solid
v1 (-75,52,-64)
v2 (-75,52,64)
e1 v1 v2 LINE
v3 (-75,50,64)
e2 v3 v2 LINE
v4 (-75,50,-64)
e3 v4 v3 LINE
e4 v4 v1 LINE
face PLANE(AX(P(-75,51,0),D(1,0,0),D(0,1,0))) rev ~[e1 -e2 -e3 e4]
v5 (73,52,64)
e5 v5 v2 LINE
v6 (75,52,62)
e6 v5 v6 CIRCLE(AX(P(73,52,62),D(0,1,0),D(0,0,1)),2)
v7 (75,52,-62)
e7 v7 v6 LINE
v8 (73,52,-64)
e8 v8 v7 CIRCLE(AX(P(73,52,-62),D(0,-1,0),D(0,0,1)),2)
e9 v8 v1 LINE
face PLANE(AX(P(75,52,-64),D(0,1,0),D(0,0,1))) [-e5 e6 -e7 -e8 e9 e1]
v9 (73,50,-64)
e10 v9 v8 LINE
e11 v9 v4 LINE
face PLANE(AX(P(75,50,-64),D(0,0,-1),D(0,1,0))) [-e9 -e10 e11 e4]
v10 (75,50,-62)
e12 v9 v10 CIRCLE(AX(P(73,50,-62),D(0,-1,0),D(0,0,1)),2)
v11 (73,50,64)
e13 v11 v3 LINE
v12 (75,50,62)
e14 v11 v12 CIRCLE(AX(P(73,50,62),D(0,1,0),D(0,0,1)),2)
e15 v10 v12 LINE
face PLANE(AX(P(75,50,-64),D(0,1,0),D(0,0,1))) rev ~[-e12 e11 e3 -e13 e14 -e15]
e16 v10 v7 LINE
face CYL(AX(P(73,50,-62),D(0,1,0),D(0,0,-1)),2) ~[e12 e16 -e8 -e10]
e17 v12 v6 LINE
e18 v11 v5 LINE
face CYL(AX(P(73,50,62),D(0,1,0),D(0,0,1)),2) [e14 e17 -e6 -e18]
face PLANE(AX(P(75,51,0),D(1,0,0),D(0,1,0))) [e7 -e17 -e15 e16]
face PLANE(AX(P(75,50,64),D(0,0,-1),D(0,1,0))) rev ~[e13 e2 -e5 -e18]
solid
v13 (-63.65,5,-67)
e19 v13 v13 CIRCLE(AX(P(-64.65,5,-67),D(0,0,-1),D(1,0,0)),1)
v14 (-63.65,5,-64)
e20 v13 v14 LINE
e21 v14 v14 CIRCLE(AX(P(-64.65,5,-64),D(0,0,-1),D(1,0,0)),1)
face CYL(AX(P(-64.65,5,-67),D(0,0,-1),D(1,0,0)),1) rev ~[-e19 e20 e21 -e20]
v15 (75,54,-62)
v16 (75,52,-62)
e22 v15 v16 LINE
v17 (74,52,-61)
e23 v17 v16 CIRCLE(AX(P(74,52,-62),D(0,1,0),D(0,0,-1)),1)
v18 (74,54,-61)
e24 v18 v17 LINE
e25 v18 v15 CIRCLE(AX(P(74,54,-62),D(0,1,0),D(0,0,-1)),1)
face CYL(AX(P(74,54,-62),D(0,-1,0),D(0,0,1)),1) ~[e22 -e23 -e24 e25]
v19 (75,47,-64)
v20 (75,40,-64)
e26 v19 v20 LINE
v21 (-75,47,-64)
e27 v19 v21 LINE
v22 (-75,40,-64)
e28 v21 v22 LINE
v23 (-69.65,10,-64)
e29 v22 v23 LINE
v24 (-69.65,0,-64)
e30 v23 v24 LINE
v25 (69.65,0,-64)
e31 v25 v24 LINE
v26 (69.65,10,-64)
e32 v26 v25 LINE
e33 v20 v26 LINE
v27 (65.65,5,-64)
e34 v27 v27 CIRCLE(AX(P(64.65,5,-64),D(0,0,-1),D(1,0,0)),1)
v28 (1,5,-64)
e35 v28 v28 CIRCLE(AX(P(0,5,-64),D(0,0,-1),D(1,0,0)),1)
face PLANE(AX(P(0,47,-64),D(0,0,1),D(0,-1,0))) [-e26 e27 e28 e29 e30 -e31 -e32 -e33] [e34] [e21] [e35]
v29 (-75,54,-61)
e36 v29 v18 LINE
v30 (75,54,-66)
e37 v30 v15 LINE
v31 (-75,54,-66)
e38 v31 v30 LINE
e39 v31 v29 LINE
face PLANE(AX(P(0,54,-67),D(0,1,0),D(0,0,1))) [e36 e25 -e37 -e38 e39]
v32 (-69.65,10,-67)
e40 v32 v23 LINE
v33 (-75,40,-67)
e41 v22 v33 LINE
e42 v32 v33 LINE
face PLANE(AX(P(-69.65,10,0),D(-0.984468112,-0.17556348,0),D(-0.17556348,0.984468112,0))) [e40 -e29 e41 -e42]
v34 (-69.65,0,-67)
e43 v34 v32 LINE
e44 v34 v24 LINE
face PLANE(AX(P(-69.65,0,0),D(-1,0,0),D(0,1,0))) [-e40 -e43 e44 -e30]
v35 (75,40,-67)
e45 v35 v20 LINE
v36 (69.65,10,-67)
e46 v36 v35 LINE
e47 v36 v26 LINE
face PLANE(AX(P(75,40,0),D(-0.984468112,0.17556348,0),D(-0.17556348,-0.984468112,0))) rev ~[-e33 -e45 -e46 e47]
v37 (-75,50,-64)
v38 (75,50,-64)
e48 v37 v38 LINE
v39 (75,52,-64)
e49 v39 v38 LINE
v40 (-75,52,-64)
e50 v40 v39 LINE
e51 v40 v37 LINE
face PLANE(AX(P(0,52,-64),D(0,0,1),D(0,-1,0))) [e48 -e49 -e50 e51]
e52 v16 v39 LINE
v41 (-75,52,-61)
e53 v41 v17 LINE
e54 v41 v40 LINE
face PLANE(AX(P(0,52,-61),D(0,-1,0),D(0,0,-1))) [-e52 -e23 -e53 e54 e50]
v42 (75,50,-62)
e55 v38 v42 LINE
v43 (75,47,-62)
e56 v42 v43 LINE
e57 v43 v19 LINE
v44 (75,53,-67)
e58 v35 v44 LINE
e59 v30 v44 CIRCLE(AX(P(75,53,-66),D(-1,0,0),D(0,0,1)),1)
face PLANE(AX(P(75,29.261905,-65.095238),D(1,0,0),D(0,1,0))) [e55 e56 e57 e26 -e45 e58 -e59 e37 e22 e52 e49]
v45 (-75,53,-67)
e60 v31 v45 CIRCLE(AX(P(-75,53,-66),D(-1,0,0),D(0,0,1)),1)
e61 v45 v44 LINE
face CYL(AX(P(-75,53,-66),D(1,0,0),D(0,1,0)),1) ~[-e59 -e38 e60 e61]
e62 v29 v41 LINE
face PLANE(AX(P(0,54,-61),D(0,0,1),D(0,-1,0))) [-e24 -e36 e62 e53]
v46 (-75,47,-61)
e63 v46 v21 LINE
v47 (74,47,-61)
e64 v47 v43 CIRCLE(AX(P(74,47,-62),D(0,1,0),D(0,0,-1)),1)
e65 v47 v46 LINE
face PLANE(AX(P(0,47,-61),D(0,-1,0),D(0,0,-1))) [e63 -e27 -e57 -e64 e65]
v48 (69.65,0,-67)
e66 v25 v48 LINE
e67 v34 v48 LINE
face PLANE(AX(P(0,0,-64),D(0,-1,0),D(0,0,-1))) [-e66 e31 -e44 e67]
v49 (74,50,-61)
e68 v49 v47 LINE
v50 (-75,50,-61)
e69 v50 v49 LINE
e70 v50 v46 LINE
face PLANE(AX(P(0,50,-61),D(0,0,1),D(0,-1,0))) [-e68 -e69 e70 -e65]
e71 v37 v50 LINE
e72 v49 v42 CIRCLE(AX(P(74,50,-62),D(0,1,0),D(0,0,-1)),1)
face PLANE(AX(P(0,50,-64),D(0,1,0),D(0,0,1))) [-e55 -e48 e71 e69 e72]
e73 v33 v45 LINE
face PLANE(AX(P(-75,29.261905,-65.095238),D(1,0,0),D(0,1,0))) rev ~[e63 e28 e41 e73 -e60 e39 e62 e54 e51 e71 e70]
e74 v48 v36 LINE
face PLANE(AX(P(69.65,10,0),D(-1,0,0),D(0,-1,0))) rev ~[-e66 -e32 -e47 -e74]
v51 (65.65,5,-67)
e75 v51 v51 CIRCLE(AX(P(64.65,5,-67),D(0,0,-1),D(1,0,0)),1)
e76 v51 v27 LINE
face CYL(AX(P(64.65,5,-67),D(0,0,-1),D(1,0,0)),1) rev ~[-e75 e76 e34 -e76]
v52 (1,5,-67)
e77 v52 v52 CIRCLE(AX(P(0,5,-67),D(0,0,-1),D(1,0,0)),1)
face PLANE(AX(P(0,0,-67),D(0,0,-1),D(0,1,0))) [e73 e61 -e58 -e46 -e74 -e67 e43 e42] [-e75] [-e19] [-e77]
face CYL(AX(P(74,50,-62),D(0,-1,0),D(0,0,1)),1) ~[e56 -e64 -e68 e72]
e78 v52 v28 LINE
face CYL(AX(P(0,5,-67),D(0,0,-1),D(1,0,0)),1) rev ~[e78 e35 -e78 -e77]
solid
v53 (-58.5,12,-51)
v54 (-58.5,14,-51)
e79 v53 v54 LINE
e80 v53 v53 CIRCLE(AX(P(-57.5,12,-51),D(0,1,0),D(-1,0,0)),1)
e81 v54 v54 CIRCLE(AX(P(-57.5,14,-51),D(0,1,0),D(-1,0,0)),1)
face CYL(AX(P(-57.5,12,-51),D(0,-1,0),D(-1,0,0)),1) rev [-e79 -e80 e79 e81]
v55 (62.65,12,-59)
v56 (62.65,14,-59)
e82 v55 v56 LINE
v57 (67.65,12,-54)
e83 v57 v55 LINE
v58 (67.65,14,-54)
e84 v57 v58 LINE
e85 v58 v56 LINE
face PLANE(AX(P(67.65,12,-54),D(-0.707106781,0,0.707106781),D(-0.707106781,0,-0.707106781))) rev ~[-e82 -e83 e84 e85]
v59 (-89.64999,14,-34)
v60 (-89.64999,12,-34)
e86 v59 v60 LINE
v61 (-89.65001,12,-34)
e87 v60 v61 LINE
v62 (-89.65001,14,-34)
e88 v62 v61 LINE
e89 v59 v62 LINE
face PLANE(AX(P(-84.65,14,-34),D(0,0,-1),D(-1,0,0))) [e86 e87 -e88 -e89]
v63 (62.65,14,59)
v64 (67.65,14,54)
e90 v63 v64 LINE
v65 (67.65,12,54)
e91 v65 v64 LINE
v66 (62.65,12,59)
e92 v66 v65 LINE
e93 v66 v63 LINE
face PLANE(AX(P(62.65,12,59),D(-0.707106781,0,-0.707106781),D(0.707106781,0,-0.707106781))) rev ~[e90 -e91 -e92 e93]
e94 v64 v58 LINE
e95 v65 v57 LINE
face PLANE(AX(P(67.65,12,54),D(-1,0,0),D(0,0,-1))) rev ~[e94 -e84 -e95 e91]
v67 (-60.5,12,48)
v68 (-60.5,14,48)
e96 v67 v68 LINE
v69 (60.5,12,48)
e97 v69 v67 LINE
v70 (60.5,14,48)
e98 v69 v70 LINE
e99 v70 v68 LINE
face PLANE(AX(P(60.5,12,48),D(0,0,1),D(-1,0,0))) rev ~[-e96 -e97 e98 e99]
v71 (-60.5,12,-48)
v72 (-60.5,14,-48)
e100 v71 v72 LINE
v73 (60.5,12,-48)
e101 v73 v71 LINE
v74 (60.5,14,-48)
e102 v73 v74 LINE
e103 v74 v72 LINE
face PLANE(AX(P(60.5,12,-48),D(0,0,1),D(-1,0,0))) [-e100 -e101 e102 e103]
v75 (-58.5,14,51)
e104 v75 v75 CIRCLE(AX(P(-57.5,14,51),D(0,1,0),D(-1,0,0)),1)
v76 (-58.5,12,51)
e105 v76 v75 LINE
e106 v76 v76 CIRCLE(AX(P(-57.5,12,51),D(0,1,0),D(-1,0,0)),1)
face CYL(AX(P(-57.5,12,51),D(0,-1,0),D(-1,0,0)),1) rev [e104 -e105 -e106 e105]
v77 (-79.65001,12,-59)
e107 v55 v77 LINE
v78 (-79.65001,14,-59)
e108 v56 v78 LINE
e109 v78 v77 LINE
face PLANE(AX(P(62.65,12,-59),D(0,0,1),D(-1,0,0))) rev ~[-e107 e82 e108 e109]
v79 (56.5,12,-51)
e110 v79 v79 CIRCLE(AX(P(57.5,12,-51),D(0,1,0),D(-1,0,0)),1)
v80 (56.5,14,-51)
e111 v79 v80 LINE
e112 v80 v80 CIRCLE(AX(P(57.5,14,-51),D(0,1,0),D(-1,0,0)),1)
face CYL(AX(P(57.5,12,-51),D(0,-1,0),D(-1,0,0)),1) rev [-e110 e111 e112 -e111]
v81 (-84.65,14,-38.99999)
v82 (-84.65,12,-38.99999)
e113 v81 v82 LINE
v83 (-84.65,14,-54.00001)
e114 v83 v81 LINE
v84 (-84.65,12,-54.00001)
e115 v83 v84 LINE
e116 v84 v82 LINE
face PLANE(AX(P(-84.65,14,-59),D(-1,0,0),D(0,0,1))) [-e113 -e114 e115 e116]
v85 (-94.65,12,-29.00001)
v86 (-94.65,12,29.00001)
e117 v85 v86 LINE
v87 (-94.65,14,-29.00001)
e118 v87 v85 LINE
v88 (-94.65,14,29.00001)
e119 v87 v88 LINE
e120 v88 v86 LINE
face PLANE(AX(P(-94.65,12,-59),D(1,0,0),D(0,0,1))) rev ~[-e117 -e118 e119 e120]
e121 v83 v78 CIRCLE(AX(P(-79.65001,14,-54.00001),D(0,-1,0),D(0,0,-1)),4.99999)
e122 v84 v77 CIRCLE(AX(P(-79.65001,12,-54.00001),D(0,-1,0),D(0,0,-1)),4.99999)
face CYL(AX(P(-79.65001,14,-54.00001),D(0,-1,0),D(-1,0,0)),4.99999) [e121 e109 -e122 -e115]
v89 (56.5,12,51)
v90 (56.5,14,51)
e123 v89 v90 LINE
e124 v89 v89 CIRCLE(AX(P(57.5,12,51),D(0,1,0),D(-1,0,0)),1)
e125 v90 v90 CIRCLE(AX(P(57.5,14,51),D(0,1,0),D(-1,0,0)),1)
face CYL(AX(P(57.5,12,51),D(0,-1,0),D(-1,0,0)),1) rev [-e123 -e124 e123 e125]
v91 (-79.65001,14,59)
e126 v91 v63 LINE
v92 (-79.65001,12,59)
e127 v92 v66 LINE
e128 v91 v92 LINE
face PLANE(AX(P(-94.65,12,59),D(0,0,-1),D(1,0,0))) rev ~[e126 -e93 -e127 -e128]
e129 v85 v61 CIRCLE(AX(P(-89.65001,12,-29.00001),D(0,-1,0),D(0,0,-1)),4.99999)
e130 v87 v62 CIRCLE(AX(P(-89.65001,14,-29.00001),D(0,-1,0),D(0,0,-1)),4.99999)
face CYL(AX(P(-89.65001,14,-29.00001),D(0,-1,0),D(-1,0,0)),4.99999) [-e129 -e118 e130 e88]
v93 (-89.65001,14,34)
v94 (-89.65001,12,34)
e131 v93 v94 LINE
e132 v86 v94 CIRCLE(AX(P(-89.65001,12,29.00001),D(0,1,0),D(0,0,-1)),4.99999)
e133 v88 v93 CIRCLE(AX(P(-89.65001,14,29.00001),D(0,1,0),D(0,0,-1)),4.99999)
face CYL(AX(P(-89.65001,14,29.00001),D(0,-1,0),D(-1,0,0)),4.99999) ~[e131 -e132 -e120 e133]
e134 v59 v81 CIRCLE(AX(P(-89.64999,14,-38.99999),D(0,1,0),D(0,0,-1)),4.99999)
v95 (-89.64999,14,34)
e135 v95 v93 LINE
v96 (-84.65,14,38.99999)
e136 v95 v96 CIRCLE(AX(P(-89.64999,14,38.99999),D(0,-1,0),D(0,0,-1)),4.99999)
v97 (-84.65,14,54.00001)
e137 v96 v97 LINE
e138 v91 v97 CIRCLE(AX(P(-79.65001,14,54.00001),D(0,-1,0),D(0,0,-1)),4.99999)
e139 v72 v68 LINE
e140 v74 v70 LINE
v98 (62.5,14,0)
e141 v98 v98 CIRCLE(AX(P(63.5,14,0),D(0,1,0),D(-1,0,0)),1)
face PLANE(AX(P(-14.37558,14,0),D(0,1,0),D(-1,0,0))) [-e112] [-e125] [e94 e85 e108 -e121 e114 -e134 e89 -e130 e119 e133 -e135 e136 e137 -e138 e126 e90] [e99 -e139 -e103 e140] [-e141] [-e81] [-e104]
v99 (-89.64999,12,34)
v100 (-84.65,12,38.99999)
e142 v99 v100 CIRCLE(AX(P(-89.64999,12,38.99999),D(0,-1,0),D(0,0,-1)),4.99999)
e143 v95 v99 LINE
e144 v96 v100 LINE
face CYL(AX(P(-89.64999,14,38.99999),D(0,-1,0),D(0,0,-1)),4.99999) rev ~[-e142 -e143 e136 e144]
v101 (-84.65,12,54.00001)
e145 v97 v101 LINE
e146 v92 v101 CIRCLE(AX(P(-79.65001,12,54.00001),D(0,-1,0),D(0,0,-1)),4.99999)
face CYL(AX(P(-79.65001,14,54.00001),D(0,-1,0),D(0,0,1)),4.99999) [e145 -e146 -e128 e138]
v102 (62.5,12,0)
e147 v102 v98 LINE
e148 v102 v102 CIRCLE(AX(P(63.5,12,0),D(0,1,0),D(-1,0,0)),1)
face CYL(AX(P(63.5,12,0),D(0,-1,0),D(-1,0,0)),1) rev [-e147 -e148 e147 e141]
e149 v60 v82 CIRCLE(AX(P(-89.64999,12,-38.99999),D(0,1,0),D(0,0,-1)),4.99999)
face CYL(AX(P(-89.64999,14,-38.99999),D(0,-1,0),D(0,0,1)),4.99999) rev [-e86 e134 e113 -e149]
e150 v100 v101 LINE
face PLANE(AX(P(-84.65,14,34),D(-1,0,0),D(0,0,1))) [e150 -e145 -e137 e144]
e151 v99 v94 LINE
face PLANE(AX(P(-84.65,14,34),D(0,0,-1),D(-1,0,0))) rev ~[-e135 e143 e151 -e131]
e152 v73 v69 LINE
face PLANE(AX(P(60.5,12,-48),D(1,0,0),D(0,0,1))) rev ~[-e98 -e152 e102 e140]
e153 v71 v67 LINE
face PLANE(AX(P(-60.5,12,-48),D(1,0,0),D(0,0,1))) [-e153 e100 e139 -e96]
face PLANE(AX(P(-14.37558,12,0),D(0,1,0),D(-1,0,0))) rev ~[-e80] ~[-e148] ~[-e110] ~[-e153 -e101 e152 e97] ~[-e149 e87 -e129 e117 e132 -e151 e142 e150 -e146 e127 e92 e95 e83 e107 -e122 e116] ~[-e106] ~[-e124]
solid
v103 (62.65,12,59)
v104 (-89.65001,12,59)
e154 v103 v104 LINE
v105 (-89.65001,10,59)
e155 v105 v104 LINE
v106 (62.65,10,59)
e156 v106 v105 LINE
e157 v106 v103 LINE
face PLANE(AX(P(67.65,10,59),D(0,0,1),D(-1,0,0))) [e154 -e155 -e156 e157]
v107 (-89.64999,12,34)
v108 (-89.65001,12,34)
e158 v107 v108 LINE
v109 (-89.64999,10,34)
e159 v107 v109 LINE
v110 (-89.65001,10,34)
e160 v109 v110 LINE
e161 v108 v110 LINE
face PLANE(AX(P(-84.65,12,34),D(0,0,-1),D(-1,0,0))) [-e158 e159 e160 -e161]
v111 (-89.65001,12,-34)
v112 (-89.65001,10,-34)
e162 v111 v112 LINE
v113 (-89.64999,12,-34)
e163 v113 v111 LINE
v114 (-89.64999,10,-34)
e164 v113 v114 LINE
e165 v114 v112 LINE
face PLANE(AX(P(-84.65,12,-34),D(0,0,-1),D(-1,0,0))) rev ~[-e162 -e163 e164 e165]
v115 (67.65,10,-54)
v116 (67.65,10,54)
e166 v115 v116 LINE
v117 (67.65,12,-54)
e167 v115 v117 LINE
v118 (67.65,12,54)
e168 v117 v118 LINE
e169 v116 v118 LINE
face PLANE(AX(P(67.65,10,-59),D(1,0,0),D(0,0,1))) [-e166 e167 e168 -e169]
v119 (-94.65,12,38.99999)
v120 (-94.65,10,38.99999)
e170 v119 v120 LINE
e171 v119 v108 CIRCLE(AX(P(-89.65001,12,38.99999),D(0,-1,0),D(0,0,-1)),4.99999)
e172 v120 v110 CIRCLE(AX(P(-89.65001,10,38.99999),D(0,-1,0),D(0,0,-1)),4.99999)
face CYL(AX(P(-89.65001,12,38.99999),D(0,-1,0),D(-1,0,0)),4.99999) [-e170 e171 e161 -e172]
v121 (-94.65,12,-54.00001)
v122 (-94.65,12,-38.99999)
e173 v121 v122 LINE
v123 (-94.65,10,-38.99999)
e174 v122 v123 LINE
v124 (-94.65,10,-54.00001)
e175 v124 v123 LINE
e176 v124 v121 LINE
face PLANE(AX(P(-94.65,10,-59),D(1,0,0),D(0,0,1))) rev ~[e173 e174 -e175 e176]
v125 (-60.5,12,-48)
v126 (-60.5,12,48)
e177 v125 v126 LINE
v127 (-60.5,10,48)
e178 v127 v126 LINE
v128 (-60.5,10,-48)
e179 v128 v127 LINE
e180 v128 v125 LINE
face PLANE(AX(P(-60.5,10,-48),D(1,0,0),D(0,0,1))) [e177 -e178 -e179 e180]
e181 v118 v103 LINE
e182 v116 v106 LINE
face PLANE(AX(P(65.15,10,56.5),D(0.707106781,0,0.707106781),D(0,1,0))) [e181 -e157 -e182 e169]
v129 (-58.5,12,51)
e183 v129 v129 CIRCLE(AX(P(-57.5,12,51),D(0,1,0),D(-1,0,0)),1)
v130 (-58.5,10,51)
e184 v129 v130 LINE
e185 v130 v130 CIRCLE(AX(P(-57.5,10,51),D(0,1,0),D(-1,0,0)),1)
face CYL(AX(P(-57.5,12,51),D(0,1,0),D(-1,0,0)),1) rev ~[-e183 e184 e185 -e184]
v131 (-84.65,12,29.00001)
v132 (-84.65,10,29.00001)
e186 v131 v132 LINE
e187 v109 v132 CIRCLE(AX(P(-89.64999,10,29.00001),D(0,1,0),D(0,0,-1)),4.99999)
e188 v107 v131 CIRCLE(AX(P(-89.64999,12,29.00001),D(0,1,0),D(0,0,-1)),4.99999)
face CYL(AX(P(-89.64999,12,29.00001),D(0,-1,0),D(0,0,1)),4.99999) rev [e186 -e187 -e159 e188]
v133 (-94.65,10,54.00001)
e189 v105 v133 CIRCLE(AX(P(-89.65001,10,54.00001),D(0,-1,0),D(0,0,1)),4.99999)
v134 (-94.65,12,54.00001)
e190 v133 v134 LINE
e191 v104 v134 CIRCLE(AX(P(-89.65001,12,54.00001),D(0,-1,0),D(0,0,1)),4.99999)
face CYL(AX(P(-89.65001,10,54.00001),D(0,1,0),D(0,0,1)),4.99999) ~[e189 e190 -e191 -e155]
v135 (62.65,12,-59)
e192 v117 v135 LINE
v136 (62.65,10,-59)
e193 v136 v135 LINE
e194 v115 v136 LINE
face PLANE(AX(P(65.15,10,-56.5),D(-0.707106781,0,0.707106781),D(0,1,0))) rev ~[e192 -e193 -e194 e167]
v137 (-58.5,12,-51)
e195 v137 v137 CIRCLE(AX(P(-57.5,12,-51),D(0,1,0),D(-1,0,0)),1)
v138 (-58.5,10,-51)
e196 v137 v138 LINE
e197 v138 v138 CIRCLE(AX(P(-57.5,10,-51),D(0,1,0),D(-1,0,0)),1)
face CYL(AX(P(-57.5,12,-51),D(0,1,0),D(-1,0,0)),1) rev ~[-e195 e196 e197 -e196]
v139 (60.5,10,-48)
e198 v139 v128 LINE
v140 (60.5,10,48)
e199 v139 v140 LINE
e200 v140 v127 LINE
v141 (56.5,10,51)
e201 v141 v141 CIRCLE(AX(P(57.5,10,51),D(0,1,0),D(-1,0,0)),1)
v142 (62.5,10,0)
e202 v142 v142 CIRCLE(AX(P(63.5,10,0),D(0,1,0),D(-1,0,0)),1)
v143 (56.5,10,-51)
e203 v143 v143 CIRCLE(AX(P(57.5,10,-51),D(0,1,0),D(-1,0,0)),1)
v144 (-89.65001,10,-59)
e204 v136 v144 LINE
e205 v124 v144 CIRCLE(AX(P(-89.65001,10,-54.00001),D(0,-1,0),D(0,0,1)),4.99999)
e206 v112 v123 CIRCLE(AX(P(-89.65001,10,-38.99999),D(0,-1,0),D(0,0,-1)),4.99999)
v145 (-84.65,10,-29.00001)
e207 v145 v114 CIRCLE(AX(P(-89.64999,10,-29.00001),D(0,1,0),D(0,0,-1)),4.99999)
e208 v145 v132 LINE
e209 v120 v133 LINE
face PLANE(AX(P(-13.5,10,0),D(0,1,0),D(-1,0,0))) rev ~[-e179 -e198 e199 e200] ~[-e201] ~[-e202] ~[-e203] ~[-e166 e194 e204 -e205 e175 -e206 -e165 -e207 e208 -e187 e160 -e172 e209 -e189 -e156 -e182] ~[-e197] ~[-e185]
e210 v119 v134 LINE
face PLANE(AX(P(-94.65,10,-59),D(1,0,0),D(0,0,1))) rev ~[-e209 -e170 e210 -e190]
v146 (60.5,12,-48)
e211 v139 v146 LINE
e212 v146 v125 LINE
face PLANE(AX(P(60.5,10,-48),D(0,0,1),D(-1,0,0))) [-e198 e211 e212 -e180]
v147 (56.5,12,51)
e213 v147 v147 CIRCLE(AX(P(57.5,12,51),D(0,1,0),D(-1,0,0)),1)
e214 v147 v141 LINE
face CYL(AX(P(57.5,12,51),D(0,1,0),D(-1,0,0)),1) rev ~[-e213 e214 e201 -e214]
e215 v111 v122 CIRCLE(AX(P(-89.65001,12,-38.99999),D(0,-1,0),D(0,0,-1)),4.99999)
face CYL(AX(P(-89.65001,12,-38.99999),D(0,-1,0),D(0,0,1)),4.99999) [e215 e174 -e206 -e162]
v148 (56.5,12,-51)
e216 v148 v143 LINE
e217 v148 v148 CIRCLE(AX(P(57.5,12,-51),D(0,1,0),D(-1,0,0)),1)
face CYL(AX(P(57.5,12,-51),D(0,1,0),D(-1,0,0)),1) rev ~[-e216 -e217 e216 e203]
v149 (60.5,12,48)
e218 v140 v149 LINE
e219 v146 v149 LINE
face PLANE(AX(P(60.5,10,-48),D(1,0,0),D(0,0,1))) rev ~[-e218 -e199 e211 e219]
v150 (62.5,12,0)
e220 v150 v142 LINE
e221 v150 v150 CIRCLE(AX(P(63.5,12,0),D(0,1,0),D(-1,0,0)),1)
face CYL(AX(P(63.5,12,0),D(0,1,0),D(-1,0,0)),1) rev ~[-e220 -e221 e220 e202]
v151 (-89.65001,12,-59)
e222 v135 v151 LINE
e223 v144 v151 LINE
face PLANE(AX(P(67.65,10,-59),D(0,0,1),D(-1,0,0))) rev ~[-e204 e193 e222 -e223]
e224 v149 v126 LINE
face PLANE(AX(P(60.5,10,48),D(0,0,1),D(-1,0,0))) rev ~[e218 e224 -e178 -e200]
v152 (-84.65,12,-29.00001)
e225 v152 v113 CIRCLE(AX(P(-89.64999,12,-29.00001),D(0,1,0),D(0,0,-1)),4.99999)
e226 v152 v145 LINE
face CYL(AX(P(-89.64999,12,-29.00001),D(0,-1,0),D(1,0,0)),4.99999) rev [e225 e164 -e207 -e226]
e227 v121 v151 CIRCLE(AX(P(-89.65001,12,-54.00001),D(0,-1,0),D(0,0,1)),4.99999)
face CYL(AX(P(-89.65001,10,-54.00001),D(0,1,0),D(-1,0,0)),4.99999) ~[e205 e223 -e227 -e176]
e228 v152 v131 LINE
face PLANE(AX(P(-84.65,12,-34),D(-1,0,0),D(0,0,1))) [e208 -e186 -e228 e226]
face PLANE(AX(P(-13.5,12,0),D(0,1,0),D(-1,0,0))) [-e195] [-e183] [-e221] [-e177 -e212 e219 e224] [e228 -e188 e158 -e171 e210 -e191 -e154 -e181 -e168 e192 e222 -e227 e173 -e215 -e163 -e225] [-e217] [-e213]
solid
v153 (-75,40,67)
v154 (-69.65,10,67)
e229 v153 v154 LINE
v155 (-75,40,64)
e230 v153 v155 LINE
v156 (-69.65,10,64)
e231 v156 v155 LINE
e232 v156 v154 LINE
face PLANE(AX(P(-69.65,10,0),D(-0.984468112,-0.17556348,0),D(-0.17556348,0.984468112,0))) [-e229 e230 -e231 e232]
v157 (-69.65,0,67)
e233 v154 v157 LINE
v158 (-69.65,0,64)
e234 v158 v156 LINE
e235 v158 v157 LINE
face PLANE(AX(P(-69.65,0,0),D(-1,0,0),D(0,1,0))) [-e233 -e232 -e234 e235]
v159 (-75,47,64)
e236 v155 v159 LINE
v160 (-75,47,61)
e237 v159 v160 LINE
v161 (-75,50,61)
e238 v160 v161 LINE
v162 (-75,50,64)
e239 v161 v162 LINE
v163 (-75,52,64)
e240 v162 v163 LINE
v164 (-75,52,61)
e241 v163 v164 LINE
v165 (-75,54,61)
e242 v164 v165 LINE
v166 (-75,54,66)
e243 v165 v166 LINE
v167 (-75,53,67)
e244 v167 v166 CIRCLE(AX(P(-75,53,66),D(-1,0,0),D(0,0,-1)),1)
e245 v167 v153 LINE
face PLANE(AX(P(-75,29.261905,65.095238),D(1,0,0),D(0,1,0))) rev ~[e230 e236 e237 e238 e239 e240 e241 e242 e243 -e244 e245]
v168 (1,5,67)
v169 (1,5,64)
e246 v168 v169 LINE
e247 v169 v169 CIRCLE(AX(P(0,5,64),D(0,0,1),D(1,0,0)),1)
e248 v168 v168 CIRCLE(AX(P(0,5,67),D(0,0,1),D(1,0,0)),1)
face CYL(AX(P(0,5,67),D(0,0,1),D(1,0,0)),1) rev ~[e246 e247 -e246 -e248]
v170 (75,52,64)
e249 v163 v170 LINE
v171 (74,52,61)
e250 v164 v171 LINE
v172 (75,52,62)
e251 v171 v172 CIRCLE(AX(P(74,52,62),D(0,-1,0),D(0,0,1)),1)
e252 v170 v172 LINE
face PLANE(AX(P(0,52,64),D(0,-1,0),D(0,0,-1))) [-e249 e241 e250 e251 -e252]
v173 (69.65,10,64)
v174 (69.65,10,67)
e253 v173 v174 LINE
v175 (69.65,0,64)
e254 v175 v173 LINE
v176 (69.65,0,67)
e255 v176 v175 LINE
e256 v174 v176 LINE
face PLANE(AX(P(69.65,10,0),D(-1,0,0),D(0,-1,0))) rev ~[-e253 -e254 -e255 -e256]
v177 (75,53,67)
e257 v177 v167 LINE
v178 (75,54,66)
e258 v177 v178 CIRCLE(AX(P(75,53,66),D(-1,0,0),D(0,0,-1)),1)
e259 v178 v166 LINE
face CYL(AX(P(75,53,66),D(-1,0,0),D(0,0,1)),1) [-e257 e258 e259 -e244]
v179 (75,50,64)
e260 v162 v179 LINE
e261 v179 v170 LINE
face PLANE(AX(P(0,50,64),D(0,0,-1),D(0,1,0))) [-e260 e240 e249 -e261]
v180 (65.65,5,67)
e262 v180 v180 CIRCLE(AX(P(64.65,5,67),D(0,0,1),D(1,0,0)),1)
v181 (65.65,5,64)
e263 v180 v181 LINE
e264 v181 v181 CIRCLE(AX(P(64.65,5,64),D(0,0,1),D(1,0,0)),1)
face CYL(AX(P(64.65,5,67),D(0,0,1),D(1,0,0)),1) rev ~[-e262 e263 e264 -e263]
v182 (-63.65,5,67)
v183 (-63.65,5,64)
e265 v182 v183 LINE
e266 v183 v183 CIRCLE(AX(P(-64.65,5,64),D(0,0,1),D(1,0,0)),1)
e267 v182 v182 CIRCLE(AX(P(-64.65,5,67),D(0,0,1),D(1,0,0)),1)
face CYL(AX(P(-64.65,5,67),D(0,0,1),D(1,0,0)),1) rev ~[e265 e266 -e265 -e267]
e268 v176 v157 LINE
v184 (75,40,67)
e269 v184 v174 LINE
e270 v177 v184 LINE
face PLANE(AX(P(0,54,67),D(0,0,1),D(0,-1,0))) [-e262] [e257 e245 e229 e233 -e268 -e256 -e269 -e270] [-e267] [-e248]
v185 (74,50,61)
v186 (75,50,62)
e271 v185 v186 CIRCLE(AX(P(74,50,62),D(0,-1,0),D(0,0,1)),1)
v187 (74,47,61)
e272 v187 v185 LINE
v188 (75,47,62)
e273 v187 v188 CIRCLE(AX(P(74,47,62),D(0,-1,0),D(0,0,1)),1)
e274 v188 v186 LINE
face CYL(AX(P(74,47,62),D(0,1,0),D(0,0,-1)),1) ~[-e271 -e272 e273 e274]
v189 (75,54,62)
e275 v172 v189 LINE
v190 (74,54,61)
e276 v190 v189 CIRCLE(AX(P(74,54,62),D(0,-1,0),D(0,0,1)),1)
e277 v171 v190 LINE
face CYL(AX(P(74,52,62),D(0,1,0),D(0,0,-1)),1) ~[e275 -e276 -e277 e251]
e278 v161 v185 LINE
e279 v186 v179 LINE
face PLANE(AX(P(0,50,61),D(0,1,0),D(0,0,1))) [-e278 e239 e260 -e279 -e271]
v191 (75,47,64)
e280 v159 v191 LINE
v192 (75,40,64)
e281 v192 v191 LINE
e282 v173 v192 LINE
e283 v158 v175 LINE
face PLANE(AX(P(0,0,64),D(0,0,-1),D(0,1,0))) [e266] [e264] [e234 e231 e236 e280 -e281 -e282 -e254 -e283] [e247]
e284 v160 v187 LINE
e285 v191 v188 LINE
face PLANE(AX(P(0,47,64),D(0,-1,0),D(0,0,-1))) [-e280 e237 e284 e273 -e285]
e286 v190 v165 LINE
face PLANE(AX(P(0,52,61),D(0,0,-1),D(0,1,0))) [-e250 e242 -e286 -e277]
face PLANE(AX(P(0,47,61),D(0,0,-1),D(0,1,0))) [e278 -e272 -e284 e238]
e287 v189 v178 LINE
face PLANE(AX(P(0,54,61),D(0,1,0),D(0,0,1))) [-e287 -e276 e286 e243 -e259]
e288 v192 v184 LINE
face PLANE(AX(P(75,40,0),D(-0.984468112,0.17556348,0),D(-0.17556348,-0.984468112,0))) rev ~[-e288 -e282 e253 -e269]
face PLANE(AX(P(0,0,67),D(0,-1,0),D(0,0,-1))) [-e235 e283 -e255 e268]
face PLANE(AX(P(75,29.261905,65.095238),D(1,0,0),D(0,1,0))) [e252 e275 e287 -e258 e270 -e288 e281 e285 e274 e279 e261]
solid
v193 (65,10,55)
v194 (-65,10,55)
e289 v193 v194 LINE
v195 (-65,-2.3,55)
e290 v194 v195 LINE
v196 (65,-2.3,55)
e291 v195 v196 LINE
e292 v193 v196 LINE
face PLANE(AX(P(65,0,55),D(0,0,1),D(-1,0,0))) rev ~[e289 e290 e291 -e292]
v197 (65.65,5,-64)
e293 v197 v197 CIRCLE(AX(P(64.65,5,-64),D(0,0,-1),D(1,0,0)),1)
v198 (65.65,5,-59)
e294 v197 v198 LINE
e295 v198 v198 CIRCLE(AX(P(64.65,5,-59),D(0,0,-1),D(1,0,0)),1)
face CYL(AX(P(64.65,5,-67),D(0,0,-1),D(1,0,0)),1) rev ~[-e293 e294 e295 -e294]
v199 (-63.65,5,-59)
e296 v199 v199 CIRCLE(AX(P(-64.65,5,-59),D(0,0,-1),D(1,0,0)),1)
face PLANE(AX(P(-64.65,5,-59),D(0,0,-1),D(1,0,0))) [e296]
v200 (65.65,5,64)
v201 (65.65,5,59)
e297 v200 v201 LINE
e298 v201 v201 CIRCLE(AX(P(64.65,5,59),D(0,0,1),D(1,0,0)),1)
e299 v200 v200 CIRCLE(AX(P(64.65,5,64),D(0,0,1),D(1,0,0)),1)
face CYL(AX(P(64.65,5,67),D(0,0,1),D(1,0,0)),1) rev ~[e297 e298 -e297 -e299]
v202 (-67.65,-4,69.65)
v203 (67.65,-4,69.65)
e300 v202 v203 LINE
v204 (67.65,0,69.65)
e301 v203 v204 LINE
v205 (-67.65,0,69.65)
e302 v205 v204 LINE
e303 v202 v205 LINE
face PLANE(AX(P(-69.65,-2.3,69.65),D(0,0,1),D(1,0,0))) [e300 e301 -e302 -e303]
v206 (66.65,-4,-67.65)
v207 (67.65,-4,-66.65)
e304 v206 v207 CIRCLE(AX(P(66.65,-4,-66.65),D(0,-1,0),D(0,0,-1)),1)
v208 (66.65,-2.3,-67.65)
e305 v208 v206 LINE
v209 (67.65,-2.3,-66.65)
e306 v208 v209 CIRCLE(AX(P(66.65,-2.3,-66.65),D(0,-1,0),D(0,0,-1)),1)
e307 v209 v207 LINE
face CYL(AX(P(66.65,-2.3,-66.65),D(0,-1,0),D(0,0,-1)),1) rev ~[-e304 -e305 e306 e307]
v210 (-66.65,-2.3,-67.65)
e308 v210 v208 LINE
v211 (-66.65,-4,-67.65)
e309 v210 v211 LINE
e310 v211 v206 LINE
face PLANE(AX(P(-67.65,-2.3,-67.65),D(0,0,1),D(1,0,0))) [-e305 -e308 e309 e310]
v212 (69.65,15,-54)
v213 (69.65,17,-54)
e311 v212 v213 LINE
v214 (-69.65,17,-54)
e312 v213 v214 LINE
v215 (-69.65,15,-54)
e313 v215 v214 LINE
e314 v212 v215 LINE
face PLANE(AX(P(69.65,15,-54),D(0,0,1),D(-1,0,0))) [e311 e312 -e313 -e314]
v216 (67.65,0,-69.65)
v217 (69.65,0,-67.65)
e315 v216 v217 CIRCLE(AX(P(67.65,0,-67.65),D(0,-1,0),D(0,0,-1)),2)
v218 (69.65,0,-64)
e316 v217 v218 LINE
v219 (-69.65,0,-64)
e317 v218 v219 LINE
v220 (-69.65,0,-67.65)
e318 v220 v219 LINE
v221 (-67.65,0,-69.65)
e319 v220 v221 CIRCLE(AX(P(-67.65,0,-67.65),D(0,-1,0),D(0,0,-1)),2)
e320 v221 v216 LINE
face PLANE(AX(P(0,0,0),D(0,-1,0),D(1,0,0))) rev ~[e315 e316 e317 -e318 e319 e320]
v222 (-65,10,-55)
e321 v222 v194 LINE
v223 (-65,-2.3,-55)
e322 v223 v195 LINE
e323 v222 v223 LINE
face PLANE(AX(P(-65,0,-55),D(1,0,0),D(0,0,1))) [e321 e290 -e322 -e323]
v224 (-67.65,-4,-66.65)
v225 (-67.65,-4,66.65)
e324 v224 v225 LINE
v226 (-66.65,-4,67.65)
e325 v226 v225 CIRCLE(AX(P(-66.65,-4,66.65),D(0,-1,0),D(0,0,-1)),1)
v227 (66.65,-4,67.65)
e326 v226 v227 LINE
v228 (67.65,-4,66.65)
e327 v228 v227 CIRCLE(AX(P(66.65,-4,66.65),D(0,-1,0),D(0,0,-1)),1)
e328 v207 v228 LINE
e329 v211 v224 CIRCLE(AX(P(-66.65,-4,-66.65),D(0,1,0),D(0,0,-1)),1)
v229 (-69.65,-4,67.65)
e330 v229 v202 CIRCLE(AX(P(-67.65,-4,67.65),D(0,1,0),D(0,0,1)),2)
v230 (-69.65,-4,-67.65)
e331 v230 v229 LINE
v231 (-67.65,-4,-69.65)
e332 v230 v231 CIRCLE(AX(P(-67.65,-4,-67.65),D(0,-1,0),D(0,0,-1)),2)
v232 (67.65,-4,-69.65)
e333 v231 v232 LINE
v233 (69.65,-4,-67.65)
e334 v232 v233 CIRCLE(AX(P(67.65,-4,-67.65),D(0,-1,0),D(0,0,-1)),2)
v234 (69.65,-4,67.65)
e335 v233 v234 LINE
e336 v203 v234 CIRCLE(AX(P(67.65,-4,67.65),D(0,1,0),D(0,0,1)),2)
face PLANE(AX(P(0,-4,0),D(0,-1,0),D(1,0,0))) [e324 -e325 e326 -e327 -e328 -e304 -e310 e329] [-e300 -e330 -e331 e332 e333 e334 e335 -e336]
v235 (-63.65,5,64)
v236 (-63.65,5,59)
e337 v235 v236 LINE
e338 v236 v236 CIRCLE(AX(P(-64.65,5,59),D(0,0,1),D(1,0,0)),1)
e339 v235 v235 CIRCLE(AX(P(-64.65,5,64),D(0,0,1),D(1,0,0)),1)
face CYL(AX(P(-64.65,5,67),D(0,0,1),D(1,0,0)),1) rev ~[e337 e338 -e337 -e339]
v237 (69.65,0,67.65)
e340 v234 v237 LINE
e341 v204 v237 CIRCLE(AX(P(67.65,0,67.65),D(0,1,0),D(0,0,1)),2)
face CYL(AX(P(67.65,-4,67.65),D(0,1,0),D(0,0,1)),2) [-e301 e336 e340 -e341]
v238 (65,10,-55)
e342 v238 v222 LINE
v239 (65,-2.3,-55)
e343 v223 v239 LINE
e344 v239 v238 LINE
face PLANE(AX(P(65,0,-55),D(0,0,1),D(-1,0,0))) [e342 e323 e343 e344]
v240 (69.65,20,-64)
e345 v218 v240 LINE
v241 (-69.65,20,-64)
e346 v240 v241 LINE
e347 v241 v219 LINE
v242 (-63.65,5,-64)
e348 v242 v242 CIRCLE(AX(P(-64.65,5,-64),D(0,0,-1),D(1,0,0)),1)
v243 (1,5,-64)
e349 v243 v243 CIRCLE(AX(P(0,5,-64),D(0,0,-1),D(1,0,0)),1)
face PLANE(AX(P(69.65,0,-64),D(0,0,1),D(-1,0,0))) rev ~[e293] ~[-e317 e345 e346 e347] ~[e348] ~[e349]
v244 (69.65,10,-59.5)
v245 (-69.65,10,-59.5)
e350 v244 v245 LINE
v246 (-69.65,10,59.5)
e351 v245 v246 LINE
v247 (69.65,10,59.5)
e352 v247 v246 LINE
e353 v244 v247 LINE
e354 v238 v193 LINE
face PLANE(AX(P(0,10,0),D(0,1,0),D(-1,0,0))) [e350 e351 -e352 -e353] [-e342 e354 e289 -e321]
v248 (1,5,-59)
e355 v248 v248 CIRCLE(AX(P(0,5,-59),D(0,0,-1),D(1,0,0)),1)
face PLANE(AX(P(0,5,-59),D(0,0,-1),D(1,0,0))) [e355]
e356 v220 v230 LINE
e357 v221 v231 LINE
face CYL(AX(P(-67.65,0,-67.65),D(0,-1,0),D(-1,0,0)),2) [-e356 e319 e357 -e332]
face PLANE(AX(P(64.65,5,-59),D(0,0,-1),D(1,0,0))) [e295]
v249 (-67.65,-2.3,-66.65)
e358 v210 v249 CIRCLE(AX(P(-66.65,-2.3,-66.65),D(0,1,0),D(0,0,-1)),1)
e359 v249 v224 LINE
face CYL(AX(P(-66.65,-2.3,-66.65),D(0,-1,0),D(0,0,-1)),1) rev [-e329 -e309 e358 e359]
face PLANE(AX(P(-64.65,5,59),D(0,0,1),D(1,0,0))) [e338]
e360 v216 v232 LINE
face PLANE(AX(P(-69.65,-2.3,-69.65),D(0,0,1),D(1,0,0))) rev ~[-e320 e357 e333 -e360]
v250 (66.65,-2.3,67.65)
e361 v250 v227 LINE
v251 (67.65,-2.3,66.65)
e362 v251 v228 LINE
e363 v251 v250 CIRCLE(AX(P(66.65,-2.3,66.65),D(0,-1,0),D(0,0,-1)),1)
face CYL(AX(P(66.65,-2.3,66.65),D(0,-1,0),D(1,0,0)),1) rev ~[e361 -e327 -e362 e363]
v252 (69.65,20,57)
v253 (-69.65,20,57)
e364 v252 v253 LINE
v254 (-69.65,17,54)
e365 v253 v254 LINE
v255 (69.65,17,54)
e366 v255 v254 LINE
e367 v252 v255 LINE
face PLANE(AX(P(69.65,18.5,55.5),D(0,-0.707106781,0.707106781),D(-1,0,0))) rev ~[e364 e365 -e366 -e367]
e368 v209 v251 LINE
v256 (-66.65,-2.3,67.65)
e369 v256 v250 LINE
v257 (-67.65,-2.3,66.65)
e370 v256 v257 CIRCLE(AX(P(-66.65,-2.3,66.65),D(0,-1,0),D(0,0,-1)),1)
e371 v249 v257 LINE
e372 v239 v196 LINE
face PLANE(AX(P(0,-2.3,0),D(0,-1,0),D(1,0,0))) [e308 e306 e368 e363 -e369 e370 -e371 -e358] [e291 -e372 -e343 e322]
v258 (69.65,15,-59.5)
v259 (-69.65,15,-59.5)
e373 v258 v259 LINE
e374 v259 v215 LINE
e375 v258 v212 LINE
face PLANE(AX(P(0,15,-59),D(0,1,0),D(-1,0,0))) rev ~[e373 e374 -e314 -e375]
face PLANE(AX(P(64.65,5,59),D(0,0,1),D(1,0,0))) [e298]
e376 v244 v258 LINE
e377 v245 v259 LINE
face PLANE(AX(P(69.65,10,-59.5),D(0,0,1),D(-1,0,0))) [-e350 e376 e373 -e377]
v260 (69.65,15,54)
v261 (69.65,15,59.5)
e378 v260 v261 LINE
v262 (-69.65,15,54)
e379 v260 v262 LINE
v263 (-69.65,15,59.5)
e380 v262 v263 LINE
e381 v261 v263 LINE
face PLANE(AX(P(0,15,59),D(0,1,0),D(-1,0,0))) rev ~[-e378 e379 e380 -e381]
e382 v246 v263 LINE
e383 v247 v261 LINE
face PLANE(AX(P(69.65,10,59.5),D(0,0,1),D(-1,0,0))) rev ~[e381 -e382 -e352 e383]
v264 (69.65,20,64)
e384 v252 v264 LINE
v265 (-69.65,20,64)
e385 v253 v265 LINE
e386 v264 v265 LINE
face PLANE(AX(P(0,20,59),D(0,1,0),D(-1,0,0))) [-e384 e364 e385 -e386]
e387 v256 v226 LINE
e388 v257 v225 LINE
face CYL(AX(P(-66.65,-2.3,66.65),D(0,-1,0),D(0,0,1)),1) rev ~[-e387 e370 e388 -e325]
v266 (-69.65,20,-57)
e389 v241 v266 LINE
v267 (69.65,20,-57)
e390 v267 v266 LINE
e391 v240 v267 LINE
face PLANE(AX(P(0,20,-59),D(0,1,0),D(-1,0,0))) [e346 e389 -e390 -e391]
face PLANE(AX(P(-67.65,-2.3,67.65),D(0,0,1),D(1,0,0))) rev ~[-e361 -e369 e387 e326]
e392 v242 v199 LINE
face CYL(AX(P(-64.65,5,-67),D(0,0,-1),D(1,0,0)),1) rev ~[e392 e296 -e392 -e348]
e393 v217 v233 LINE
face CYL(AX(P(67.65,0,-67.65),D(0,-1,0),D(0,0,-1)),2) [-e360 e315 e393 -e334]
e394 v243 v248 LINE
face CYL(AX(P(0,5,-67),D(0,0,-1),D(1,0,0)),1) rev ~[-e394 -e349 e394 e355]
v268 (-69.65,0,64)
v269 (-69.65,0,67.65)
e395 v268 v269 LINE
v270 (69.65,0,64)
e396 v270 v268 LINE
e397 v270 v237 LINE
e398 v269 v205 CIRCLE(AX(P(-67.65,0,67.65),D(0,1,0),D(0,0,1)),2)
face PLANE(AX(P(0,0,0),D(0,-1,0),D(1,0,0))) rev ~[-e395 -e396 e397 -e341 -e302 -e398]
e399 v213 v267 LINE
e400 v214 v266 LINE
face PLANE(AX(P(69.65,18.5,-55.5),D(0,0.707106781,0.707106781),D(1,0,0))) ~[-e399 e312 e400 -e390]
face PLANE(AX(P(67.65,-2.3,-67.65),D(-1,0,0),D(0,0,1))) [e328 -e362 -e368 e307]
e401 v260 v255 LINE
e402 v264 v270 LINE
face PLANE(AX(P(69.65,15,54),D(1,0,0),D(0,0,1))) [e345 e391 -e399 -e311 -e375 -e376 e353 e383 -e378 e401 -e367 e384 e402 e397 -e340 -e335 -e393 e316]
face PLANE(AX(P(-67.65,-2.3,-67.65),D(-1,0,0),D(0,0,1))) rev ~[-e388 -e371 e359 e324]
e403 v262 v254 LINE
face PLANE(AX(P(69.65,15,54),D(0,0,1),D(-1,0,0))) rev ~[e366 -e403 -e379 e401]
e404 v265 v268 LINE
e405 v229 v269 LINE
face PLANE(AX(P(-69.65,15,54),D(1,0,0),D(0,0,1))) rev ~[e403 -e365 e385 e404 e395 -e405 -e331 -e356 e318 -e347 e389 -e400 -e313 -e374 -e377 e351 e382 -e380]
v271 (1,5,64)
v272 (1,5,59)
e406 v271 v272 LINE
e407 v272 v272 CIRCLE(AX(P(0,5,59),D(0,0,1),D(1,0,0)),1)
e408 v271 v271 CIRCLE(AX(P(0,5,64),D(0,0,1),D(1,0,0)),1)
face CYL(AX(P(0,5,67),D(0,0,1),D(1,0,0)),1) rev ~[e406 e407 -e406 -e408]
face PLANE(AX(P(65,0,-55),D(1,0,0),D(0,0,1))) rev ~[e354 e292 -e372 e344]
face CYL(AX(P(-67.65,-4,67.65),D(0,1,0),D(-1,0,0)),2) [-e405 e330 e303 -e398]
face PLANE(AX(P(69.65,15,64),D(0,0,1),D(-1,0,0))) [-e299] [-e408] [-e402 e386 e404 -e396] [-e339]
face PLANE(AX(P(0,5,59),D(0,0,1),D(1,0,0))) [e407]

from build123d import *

# Parameters (mm, degrees)
F0_W      = 139.3
F0_H      = 139.3
F0_W_2    = 130
F0_H_2    = 110
F1_DEPTH  = 2.3
F2_W      = 139.3
F2_H      = 128
F2_W_2    = 130
F2_H_2    = 110
F3_DEPTH  = 10
F4_W      = 139.3
F4_H      = 139.3
F4_W_2    = 135.3
F4_H_2    = 135.3
F5_DEPTH  = 1.7
F6_R      = 1
F7_R      = 2
F8_W      = 162.3
F8_H      = 118
F8_W_2    = 121
F8_H_2    = 96
F9_DEPTH  = 2
F10_R     = 1
F11_DEPTH = 25
F12_SIZE  = 5
F13_R     = 1
F13_W     = 121
F13_H     = 96
F14_DEPTH = 2
F15_W     = 10
F15_H     = 25
F16_DEPTH = 25
F17_R     = 4.99999
F18_W     = 10
F18_H     = 68
F19_DEPTH = 25
F20_R     = 4.99999
F21_W     = 139.3
F21_H     = 4.5
F22_DEPTH = 5
F23_W     = 139.3
F23_H     = 10
F24_DEPTH = 5
F25_SIZE  = 3
F27_DEPTH = 75
F28_W     = 2
F28_H     = 128
F29_DEPTH = 150
F30_R     = 2
F31_R     = 1
F31_2_R   = 1
F33_DEPTH = 80
F34_R     = 1
F35_DEPTH = 8
F36_R     = 1
F37_DEPTH = 8


# Not quite as in the source:
# - a fillet or chamfer is up to 0.001 mm smaller than in the source, because OpenCascade refuses the exact size


with BuildPart() as f1:
    # F0 (on Front) → F1 (new body)
    with BuildSketch(Plane.XZ):
        Rectangle(F0_W, F0_H)
        Rectangle(F0_W_2, F0_H_2, mode=Mode.SUBTRACT)
    extrude(amount=F1_DEPTH)

    # F2 (on face) → F3 (join)
    with BuildSketch(Plane(origin=(0, 0, 0), x_dir=(-1, 0, 0), z_dir=(0, 1, 0))):
        Rectangle(F2_W, F2_H)
        Rectangle(F2_W_2, F2_H_2, mode=Mode.SUBTRACT)
    extrude(amount=F3_DEPTH)

    # F4 (on face) → F5 (join)
    with BuildSketch(Plane.XZ.offset(2.3)):
        Rectangle(F4_W, F4_H)
        Rectangle(F4_W_2, F4_H_2, mode=Mode.SUBTRACT)
    extrude(amount=F5_DEPTH)

    # F6
    f6_edges = [f1.edges().sort_by_distance(p)[0] for p in [
        (-67.65, -3.15, 67.65),
        (67.65, -3.15, 67.65),
        (-67.65, -3.15, -67.65),
        (67.65, -3.15, -67.65),
    ]]
    fillet(f6_edges, radius=F6_R)

    # F7
    f7_edges = [f1.edges().sort_by_distance(p)[0] for p in [
        (-69.65, -2, -69.65),
        (69.65, -2, -69.65),
        (69.65, -2, 69.65),
        (-69.65, -2, 69.65),
    ]]
    fillet(f7_edges, radius=F7_R)

    # F21 (on face) → F22 (join)
    with BuildSketch(Plane(origin=(0, 10, 0), x_dir=(-1, 0, 0), z_dir=(0, 1, 0))):
        with Locations((0, 61.75)):
            Rectangle(F21_W, F21_H)
        with Locations((0, -61.75)):
            Rectangle(F21_W, F21_H)
    extrude(amount=F22_DEPTH)

    # F23 (on face) → F24 (join)
    with BuildSketch(Plane(origin=(0, 15, 0), x_dir=(-1, 0, 0), z_dir=(0, 1, 0))):
        with Locations((0, 59)):
            Rectangle(F23_W, F23_H)
        with Locations((0, -59)):
            Rectangle(F23_W, F23_H)
    extrude(amount=F24_DEPTH)

    # F25
    f25_edges = [f1.edges().sort_by_distance(p)[0] for p in [
        (0, 20, 54),
        (0, 20, -54),
    ]]
    chamfer(f25_edges, length=F25_SIZE)


with BuildPart() as f9:
    # F8 (on face) → F9 (new body)
    with BuildSketch(Plane(origin=(0, 10, 0), x_dir=(-1, 0, 0), z_dir=(0, 1, 0))):
        with Locations((13.5, 0)):
            Rectangle(F8_W, F8_H)
        Rectangle(F8_W_2, F8_H_2, mode=Mode.SUBTRACT)
    extrude(amount=F9_DEPTH)

    # F10 (on face) → F11 (cut)
    with BuildSketch(Plane(origin=(0, 12, 0), x_dir=(-1, 0, 0), z_dir=(0, 1, 0))):
        with Locations((-57.5, 51)):
            Circle(F10_R)
        with Locations((57.5, 51)):
            Circle(F10_R)
        with Locations((57.5, -51)):
            Circle(F10_R)
        with Locations((-57.5, -51)):
            Circle(F10_R)
        with Locations((-63.5, 0)):
            Circle(F10_R)
    extrude(amount=-F11_DEPTH, mode=Mode.SUBTRACT)

    # F12
    f12_edges = [f9.edges().sort_by_distance(p)[0] for p in [
        (67.65, 11, -59),
        (67.65, 11, 59),
    ]]
    chamfer(f12_edges, length=F12_SIZE)

    # F18 (on face) → F19 (cut)
    with BuildSketch(Plane(origin=(0, 12, 0), x_dir=(-1, 0, 0), z_dir=(0, 1, 0))):
        with Locations((89.65, 0)):
            Rectangle(F18_W, F18_H)
    extrude(amount=-F19_DEPTH, mode=Mode.SUBTRACT)

    # F20 (radius 5 in the source; OpenCascade refuses exactly that, so slightly less here)
    f20_edges = [f9.edges().sort_by_distance(p)[0] for p in [
        (-94.65, 11, -59),
        (-94.65, 11, -34),
        (-84.65, 11, -34),
        (-84.65, 11, 34),
        (-94.65, 11, 34),
        (-94.65, 11, 59),
    ]]
    fillet(f20_edges, radius=F20_R)


with BuildPart() as f14:
    # F13 (on face) → F14 (new body)
    with BuildSketch(Plane(origin=(0, 12, 0), x_dir=(-1, 0, 0), z_dir=(0, 1, 0))):
        Polygon((94.65, -59), (94.65, 59), (-62.65, 59), (-67.65, 54), (-67.65, -54), (-62.65, -59), align=None)
        with Locations((-57.5, -51)):
            Circle(F13_R, mode=Mode.SUBTRACT)
        with Locations((57.5, -51)):
            Circle(F13_R, mode=Mode.SUBTRACT)
        with Locations((-63.5, 0)):
            Circle(F13_R, mode=Mode.SUBTRACT)
        Rectangle(F13_W, F13_H, mode=Mode.SUBTRACT)
        with Locations((-57.5, 51)):
            Circle(F13_R, mode=Mode.SUBTRACT)
        with Locations((57.5, 51)):
            Circle(F13_R, mode=Mode.SUBTRACT)
    extrude(amount=F14_DEPTH)

    # F15 (on face) → F16 (cut)
    with BuildSketch(Plane(origin=(0, 14, 0), x_dir=(-1, 0, 0), z_dir=(0, 1, 0))):
        with Locations((89.65, 46.5)):
            Rectangle(F15_W, F15_H)
        with Locations((89.65, -46.5)):
            Rectangle(F15_W, F15_H)
    extrude(amount=-F16_DEPTH, mode=Mode.SUBTRACT)

    # F17 (radius 5 in the source; OpenCascade refuses exactly that, so slightly less here)
    f17_edges = [f14.edges().sort_by_distance(p)[0] for p in [
        (-84.65, 13, -59),
        (-84.65, 13, -34),
        (-94.65, 13, -34),
        (-94.65, 13, 34),
        (-84.65, 13, 34),
        (-84.65, 13, 59),
    ]]
    fillet(f17_edges, radius=F17_R)


with BuildPart() as f27:
    # F26 (on Right) → F27 (new body, symmetric)
    with BuildSketch(Plane.YZ):
        Polygon((0, 67), (0, 64), (47, 64), (47, 61), (50, 61), (50, 64), (52, 64), (52, 61), (54, 61), (54, 67), align=None)
    extrude(amount=F27_DEPTH, both=True)

    # F31
    f31_edges = [f27.edges().sort_by_distance(p)[0] for p in [
        (0, 54, 67),
        (75, 53, 61),
        (75, 48.5, 61),
    ]]
    fillet(f31_edges, radius=F31_R)


with BuildPart() as f27b:
    # F26 (on Right) → F27, piece 2 (new body, symmetric)
    with BuildSketch(Plane.YZ):
        Polygon((0, -64), (0, -67), (54, -67), (54, -61), (52, -61), (52, -64), (50, -64), (50, -61), (47, -61), (47, -64), align=None)
    extrude(amount=F27_DEPTH, both=True)

    # F31#2
    f31_2_edges = [f27b.edges().sort_by_distance(p)[0] for p in [
        (0, 54, -67),
        (75, 53, -61),
        (75, 48.5, -61),
    ]]
    fillet(f31_2_edges, radius=F31_2_R)


with BuildPart() as f29:
    # F28 (on face) → F29 (new body, through all)
    with BuildSketch(Plane.YZ.offset(75)):
        with Locations((51, 0)):
            Rectangle(F28_W, F28_H)
    extrude(amount=-F29_DEPTH)

    # F30
    f30_edges = [f29.edges().sort_by_distance(p)[0] for p in [
        (75, 51, 64),
        (75, 51, -64),
    ]]
    fillet(f30_edges, radius=F30_R)


with BuildPart() as f33_tool:
    # F32 (on Top) → F33 (new body, symmetric)
    with BuildSketch(Plane.XY):
        Polygon((-75, 0), (-69.65, 0), (-69.65, 10), (-75, 40), align=None)
        Polygon((75, 0), (75, 40), (69.65, 10), (69.65, 0), align=None)
    extrude(amount=F33_DEPTH, both=True)


with BuildPart() as f27_1:
    add(f27.part)

    # F33: cut by f33_tool
    add(f33_tool.part, mode=Mode.SUBTRACT)


with BuildPart() as f27b_1:
    add(f27b.part)

    # F33: cut by f33_tool
    add(f33_tool.part, mode=Mode.SUBTRACT)


with BuildPart() as f35_tool:
    # F34 (on face) → F35 (new body)
    with BuildSketch(Plane(origin=(0, 0, -67), x_dir=(1, 0, 0), z_dir=(0, 0, -1))):
        with Locations((-64.65, -5)):
            Circle(F34_R)
        with Locations((0, -5)):
            Circle(F34_R)
        with Locations((64.65, -5)):
            Circle(F34_R)
    extrude(amount=-F35_DEPTH)


with BuildPart() as f1_1:
    add(f1.part)

    # F35: cut by f35_tool
    add(f35_tool.part, mode=Mode.SUBTRACT)


with BuildPart() as f27b_2:
    add(f27b_1.part)

    # F35: cut by f35_tool
    add(f35_tool.part, mode=Mode.SUBTRACT)


with BuildPart() as f37_tool:
    # F36 (on face) → F37 (new body)
    with BuildSketch(Plane.XY.offset(67)):
        with Locations((-64.65, 5)):
            Circle(F36_R)
        with Locations((0, 5)):
            Circle(F36_R)
        with Locations((64.65, 5)):
            Circle(F36_R)
    extrude(amount=-F37_DEPTH)


with BuildPart() as f1_2:
    add(f1_1.part)

    # F37: cut by f37_tool
    add(f37_tool.part, mode=Mode.SUBTRACT)


with BuildPart() as f27_2:
    add(f27_1.part)

    # F37: cut by f37_tool
    add(f37_tool.part, mode=Mode.SUBTRACT)


solid = Compound([f9.part, f14.part, f29.part, f27b_2.part, f1_2.part, f27_2.part])
